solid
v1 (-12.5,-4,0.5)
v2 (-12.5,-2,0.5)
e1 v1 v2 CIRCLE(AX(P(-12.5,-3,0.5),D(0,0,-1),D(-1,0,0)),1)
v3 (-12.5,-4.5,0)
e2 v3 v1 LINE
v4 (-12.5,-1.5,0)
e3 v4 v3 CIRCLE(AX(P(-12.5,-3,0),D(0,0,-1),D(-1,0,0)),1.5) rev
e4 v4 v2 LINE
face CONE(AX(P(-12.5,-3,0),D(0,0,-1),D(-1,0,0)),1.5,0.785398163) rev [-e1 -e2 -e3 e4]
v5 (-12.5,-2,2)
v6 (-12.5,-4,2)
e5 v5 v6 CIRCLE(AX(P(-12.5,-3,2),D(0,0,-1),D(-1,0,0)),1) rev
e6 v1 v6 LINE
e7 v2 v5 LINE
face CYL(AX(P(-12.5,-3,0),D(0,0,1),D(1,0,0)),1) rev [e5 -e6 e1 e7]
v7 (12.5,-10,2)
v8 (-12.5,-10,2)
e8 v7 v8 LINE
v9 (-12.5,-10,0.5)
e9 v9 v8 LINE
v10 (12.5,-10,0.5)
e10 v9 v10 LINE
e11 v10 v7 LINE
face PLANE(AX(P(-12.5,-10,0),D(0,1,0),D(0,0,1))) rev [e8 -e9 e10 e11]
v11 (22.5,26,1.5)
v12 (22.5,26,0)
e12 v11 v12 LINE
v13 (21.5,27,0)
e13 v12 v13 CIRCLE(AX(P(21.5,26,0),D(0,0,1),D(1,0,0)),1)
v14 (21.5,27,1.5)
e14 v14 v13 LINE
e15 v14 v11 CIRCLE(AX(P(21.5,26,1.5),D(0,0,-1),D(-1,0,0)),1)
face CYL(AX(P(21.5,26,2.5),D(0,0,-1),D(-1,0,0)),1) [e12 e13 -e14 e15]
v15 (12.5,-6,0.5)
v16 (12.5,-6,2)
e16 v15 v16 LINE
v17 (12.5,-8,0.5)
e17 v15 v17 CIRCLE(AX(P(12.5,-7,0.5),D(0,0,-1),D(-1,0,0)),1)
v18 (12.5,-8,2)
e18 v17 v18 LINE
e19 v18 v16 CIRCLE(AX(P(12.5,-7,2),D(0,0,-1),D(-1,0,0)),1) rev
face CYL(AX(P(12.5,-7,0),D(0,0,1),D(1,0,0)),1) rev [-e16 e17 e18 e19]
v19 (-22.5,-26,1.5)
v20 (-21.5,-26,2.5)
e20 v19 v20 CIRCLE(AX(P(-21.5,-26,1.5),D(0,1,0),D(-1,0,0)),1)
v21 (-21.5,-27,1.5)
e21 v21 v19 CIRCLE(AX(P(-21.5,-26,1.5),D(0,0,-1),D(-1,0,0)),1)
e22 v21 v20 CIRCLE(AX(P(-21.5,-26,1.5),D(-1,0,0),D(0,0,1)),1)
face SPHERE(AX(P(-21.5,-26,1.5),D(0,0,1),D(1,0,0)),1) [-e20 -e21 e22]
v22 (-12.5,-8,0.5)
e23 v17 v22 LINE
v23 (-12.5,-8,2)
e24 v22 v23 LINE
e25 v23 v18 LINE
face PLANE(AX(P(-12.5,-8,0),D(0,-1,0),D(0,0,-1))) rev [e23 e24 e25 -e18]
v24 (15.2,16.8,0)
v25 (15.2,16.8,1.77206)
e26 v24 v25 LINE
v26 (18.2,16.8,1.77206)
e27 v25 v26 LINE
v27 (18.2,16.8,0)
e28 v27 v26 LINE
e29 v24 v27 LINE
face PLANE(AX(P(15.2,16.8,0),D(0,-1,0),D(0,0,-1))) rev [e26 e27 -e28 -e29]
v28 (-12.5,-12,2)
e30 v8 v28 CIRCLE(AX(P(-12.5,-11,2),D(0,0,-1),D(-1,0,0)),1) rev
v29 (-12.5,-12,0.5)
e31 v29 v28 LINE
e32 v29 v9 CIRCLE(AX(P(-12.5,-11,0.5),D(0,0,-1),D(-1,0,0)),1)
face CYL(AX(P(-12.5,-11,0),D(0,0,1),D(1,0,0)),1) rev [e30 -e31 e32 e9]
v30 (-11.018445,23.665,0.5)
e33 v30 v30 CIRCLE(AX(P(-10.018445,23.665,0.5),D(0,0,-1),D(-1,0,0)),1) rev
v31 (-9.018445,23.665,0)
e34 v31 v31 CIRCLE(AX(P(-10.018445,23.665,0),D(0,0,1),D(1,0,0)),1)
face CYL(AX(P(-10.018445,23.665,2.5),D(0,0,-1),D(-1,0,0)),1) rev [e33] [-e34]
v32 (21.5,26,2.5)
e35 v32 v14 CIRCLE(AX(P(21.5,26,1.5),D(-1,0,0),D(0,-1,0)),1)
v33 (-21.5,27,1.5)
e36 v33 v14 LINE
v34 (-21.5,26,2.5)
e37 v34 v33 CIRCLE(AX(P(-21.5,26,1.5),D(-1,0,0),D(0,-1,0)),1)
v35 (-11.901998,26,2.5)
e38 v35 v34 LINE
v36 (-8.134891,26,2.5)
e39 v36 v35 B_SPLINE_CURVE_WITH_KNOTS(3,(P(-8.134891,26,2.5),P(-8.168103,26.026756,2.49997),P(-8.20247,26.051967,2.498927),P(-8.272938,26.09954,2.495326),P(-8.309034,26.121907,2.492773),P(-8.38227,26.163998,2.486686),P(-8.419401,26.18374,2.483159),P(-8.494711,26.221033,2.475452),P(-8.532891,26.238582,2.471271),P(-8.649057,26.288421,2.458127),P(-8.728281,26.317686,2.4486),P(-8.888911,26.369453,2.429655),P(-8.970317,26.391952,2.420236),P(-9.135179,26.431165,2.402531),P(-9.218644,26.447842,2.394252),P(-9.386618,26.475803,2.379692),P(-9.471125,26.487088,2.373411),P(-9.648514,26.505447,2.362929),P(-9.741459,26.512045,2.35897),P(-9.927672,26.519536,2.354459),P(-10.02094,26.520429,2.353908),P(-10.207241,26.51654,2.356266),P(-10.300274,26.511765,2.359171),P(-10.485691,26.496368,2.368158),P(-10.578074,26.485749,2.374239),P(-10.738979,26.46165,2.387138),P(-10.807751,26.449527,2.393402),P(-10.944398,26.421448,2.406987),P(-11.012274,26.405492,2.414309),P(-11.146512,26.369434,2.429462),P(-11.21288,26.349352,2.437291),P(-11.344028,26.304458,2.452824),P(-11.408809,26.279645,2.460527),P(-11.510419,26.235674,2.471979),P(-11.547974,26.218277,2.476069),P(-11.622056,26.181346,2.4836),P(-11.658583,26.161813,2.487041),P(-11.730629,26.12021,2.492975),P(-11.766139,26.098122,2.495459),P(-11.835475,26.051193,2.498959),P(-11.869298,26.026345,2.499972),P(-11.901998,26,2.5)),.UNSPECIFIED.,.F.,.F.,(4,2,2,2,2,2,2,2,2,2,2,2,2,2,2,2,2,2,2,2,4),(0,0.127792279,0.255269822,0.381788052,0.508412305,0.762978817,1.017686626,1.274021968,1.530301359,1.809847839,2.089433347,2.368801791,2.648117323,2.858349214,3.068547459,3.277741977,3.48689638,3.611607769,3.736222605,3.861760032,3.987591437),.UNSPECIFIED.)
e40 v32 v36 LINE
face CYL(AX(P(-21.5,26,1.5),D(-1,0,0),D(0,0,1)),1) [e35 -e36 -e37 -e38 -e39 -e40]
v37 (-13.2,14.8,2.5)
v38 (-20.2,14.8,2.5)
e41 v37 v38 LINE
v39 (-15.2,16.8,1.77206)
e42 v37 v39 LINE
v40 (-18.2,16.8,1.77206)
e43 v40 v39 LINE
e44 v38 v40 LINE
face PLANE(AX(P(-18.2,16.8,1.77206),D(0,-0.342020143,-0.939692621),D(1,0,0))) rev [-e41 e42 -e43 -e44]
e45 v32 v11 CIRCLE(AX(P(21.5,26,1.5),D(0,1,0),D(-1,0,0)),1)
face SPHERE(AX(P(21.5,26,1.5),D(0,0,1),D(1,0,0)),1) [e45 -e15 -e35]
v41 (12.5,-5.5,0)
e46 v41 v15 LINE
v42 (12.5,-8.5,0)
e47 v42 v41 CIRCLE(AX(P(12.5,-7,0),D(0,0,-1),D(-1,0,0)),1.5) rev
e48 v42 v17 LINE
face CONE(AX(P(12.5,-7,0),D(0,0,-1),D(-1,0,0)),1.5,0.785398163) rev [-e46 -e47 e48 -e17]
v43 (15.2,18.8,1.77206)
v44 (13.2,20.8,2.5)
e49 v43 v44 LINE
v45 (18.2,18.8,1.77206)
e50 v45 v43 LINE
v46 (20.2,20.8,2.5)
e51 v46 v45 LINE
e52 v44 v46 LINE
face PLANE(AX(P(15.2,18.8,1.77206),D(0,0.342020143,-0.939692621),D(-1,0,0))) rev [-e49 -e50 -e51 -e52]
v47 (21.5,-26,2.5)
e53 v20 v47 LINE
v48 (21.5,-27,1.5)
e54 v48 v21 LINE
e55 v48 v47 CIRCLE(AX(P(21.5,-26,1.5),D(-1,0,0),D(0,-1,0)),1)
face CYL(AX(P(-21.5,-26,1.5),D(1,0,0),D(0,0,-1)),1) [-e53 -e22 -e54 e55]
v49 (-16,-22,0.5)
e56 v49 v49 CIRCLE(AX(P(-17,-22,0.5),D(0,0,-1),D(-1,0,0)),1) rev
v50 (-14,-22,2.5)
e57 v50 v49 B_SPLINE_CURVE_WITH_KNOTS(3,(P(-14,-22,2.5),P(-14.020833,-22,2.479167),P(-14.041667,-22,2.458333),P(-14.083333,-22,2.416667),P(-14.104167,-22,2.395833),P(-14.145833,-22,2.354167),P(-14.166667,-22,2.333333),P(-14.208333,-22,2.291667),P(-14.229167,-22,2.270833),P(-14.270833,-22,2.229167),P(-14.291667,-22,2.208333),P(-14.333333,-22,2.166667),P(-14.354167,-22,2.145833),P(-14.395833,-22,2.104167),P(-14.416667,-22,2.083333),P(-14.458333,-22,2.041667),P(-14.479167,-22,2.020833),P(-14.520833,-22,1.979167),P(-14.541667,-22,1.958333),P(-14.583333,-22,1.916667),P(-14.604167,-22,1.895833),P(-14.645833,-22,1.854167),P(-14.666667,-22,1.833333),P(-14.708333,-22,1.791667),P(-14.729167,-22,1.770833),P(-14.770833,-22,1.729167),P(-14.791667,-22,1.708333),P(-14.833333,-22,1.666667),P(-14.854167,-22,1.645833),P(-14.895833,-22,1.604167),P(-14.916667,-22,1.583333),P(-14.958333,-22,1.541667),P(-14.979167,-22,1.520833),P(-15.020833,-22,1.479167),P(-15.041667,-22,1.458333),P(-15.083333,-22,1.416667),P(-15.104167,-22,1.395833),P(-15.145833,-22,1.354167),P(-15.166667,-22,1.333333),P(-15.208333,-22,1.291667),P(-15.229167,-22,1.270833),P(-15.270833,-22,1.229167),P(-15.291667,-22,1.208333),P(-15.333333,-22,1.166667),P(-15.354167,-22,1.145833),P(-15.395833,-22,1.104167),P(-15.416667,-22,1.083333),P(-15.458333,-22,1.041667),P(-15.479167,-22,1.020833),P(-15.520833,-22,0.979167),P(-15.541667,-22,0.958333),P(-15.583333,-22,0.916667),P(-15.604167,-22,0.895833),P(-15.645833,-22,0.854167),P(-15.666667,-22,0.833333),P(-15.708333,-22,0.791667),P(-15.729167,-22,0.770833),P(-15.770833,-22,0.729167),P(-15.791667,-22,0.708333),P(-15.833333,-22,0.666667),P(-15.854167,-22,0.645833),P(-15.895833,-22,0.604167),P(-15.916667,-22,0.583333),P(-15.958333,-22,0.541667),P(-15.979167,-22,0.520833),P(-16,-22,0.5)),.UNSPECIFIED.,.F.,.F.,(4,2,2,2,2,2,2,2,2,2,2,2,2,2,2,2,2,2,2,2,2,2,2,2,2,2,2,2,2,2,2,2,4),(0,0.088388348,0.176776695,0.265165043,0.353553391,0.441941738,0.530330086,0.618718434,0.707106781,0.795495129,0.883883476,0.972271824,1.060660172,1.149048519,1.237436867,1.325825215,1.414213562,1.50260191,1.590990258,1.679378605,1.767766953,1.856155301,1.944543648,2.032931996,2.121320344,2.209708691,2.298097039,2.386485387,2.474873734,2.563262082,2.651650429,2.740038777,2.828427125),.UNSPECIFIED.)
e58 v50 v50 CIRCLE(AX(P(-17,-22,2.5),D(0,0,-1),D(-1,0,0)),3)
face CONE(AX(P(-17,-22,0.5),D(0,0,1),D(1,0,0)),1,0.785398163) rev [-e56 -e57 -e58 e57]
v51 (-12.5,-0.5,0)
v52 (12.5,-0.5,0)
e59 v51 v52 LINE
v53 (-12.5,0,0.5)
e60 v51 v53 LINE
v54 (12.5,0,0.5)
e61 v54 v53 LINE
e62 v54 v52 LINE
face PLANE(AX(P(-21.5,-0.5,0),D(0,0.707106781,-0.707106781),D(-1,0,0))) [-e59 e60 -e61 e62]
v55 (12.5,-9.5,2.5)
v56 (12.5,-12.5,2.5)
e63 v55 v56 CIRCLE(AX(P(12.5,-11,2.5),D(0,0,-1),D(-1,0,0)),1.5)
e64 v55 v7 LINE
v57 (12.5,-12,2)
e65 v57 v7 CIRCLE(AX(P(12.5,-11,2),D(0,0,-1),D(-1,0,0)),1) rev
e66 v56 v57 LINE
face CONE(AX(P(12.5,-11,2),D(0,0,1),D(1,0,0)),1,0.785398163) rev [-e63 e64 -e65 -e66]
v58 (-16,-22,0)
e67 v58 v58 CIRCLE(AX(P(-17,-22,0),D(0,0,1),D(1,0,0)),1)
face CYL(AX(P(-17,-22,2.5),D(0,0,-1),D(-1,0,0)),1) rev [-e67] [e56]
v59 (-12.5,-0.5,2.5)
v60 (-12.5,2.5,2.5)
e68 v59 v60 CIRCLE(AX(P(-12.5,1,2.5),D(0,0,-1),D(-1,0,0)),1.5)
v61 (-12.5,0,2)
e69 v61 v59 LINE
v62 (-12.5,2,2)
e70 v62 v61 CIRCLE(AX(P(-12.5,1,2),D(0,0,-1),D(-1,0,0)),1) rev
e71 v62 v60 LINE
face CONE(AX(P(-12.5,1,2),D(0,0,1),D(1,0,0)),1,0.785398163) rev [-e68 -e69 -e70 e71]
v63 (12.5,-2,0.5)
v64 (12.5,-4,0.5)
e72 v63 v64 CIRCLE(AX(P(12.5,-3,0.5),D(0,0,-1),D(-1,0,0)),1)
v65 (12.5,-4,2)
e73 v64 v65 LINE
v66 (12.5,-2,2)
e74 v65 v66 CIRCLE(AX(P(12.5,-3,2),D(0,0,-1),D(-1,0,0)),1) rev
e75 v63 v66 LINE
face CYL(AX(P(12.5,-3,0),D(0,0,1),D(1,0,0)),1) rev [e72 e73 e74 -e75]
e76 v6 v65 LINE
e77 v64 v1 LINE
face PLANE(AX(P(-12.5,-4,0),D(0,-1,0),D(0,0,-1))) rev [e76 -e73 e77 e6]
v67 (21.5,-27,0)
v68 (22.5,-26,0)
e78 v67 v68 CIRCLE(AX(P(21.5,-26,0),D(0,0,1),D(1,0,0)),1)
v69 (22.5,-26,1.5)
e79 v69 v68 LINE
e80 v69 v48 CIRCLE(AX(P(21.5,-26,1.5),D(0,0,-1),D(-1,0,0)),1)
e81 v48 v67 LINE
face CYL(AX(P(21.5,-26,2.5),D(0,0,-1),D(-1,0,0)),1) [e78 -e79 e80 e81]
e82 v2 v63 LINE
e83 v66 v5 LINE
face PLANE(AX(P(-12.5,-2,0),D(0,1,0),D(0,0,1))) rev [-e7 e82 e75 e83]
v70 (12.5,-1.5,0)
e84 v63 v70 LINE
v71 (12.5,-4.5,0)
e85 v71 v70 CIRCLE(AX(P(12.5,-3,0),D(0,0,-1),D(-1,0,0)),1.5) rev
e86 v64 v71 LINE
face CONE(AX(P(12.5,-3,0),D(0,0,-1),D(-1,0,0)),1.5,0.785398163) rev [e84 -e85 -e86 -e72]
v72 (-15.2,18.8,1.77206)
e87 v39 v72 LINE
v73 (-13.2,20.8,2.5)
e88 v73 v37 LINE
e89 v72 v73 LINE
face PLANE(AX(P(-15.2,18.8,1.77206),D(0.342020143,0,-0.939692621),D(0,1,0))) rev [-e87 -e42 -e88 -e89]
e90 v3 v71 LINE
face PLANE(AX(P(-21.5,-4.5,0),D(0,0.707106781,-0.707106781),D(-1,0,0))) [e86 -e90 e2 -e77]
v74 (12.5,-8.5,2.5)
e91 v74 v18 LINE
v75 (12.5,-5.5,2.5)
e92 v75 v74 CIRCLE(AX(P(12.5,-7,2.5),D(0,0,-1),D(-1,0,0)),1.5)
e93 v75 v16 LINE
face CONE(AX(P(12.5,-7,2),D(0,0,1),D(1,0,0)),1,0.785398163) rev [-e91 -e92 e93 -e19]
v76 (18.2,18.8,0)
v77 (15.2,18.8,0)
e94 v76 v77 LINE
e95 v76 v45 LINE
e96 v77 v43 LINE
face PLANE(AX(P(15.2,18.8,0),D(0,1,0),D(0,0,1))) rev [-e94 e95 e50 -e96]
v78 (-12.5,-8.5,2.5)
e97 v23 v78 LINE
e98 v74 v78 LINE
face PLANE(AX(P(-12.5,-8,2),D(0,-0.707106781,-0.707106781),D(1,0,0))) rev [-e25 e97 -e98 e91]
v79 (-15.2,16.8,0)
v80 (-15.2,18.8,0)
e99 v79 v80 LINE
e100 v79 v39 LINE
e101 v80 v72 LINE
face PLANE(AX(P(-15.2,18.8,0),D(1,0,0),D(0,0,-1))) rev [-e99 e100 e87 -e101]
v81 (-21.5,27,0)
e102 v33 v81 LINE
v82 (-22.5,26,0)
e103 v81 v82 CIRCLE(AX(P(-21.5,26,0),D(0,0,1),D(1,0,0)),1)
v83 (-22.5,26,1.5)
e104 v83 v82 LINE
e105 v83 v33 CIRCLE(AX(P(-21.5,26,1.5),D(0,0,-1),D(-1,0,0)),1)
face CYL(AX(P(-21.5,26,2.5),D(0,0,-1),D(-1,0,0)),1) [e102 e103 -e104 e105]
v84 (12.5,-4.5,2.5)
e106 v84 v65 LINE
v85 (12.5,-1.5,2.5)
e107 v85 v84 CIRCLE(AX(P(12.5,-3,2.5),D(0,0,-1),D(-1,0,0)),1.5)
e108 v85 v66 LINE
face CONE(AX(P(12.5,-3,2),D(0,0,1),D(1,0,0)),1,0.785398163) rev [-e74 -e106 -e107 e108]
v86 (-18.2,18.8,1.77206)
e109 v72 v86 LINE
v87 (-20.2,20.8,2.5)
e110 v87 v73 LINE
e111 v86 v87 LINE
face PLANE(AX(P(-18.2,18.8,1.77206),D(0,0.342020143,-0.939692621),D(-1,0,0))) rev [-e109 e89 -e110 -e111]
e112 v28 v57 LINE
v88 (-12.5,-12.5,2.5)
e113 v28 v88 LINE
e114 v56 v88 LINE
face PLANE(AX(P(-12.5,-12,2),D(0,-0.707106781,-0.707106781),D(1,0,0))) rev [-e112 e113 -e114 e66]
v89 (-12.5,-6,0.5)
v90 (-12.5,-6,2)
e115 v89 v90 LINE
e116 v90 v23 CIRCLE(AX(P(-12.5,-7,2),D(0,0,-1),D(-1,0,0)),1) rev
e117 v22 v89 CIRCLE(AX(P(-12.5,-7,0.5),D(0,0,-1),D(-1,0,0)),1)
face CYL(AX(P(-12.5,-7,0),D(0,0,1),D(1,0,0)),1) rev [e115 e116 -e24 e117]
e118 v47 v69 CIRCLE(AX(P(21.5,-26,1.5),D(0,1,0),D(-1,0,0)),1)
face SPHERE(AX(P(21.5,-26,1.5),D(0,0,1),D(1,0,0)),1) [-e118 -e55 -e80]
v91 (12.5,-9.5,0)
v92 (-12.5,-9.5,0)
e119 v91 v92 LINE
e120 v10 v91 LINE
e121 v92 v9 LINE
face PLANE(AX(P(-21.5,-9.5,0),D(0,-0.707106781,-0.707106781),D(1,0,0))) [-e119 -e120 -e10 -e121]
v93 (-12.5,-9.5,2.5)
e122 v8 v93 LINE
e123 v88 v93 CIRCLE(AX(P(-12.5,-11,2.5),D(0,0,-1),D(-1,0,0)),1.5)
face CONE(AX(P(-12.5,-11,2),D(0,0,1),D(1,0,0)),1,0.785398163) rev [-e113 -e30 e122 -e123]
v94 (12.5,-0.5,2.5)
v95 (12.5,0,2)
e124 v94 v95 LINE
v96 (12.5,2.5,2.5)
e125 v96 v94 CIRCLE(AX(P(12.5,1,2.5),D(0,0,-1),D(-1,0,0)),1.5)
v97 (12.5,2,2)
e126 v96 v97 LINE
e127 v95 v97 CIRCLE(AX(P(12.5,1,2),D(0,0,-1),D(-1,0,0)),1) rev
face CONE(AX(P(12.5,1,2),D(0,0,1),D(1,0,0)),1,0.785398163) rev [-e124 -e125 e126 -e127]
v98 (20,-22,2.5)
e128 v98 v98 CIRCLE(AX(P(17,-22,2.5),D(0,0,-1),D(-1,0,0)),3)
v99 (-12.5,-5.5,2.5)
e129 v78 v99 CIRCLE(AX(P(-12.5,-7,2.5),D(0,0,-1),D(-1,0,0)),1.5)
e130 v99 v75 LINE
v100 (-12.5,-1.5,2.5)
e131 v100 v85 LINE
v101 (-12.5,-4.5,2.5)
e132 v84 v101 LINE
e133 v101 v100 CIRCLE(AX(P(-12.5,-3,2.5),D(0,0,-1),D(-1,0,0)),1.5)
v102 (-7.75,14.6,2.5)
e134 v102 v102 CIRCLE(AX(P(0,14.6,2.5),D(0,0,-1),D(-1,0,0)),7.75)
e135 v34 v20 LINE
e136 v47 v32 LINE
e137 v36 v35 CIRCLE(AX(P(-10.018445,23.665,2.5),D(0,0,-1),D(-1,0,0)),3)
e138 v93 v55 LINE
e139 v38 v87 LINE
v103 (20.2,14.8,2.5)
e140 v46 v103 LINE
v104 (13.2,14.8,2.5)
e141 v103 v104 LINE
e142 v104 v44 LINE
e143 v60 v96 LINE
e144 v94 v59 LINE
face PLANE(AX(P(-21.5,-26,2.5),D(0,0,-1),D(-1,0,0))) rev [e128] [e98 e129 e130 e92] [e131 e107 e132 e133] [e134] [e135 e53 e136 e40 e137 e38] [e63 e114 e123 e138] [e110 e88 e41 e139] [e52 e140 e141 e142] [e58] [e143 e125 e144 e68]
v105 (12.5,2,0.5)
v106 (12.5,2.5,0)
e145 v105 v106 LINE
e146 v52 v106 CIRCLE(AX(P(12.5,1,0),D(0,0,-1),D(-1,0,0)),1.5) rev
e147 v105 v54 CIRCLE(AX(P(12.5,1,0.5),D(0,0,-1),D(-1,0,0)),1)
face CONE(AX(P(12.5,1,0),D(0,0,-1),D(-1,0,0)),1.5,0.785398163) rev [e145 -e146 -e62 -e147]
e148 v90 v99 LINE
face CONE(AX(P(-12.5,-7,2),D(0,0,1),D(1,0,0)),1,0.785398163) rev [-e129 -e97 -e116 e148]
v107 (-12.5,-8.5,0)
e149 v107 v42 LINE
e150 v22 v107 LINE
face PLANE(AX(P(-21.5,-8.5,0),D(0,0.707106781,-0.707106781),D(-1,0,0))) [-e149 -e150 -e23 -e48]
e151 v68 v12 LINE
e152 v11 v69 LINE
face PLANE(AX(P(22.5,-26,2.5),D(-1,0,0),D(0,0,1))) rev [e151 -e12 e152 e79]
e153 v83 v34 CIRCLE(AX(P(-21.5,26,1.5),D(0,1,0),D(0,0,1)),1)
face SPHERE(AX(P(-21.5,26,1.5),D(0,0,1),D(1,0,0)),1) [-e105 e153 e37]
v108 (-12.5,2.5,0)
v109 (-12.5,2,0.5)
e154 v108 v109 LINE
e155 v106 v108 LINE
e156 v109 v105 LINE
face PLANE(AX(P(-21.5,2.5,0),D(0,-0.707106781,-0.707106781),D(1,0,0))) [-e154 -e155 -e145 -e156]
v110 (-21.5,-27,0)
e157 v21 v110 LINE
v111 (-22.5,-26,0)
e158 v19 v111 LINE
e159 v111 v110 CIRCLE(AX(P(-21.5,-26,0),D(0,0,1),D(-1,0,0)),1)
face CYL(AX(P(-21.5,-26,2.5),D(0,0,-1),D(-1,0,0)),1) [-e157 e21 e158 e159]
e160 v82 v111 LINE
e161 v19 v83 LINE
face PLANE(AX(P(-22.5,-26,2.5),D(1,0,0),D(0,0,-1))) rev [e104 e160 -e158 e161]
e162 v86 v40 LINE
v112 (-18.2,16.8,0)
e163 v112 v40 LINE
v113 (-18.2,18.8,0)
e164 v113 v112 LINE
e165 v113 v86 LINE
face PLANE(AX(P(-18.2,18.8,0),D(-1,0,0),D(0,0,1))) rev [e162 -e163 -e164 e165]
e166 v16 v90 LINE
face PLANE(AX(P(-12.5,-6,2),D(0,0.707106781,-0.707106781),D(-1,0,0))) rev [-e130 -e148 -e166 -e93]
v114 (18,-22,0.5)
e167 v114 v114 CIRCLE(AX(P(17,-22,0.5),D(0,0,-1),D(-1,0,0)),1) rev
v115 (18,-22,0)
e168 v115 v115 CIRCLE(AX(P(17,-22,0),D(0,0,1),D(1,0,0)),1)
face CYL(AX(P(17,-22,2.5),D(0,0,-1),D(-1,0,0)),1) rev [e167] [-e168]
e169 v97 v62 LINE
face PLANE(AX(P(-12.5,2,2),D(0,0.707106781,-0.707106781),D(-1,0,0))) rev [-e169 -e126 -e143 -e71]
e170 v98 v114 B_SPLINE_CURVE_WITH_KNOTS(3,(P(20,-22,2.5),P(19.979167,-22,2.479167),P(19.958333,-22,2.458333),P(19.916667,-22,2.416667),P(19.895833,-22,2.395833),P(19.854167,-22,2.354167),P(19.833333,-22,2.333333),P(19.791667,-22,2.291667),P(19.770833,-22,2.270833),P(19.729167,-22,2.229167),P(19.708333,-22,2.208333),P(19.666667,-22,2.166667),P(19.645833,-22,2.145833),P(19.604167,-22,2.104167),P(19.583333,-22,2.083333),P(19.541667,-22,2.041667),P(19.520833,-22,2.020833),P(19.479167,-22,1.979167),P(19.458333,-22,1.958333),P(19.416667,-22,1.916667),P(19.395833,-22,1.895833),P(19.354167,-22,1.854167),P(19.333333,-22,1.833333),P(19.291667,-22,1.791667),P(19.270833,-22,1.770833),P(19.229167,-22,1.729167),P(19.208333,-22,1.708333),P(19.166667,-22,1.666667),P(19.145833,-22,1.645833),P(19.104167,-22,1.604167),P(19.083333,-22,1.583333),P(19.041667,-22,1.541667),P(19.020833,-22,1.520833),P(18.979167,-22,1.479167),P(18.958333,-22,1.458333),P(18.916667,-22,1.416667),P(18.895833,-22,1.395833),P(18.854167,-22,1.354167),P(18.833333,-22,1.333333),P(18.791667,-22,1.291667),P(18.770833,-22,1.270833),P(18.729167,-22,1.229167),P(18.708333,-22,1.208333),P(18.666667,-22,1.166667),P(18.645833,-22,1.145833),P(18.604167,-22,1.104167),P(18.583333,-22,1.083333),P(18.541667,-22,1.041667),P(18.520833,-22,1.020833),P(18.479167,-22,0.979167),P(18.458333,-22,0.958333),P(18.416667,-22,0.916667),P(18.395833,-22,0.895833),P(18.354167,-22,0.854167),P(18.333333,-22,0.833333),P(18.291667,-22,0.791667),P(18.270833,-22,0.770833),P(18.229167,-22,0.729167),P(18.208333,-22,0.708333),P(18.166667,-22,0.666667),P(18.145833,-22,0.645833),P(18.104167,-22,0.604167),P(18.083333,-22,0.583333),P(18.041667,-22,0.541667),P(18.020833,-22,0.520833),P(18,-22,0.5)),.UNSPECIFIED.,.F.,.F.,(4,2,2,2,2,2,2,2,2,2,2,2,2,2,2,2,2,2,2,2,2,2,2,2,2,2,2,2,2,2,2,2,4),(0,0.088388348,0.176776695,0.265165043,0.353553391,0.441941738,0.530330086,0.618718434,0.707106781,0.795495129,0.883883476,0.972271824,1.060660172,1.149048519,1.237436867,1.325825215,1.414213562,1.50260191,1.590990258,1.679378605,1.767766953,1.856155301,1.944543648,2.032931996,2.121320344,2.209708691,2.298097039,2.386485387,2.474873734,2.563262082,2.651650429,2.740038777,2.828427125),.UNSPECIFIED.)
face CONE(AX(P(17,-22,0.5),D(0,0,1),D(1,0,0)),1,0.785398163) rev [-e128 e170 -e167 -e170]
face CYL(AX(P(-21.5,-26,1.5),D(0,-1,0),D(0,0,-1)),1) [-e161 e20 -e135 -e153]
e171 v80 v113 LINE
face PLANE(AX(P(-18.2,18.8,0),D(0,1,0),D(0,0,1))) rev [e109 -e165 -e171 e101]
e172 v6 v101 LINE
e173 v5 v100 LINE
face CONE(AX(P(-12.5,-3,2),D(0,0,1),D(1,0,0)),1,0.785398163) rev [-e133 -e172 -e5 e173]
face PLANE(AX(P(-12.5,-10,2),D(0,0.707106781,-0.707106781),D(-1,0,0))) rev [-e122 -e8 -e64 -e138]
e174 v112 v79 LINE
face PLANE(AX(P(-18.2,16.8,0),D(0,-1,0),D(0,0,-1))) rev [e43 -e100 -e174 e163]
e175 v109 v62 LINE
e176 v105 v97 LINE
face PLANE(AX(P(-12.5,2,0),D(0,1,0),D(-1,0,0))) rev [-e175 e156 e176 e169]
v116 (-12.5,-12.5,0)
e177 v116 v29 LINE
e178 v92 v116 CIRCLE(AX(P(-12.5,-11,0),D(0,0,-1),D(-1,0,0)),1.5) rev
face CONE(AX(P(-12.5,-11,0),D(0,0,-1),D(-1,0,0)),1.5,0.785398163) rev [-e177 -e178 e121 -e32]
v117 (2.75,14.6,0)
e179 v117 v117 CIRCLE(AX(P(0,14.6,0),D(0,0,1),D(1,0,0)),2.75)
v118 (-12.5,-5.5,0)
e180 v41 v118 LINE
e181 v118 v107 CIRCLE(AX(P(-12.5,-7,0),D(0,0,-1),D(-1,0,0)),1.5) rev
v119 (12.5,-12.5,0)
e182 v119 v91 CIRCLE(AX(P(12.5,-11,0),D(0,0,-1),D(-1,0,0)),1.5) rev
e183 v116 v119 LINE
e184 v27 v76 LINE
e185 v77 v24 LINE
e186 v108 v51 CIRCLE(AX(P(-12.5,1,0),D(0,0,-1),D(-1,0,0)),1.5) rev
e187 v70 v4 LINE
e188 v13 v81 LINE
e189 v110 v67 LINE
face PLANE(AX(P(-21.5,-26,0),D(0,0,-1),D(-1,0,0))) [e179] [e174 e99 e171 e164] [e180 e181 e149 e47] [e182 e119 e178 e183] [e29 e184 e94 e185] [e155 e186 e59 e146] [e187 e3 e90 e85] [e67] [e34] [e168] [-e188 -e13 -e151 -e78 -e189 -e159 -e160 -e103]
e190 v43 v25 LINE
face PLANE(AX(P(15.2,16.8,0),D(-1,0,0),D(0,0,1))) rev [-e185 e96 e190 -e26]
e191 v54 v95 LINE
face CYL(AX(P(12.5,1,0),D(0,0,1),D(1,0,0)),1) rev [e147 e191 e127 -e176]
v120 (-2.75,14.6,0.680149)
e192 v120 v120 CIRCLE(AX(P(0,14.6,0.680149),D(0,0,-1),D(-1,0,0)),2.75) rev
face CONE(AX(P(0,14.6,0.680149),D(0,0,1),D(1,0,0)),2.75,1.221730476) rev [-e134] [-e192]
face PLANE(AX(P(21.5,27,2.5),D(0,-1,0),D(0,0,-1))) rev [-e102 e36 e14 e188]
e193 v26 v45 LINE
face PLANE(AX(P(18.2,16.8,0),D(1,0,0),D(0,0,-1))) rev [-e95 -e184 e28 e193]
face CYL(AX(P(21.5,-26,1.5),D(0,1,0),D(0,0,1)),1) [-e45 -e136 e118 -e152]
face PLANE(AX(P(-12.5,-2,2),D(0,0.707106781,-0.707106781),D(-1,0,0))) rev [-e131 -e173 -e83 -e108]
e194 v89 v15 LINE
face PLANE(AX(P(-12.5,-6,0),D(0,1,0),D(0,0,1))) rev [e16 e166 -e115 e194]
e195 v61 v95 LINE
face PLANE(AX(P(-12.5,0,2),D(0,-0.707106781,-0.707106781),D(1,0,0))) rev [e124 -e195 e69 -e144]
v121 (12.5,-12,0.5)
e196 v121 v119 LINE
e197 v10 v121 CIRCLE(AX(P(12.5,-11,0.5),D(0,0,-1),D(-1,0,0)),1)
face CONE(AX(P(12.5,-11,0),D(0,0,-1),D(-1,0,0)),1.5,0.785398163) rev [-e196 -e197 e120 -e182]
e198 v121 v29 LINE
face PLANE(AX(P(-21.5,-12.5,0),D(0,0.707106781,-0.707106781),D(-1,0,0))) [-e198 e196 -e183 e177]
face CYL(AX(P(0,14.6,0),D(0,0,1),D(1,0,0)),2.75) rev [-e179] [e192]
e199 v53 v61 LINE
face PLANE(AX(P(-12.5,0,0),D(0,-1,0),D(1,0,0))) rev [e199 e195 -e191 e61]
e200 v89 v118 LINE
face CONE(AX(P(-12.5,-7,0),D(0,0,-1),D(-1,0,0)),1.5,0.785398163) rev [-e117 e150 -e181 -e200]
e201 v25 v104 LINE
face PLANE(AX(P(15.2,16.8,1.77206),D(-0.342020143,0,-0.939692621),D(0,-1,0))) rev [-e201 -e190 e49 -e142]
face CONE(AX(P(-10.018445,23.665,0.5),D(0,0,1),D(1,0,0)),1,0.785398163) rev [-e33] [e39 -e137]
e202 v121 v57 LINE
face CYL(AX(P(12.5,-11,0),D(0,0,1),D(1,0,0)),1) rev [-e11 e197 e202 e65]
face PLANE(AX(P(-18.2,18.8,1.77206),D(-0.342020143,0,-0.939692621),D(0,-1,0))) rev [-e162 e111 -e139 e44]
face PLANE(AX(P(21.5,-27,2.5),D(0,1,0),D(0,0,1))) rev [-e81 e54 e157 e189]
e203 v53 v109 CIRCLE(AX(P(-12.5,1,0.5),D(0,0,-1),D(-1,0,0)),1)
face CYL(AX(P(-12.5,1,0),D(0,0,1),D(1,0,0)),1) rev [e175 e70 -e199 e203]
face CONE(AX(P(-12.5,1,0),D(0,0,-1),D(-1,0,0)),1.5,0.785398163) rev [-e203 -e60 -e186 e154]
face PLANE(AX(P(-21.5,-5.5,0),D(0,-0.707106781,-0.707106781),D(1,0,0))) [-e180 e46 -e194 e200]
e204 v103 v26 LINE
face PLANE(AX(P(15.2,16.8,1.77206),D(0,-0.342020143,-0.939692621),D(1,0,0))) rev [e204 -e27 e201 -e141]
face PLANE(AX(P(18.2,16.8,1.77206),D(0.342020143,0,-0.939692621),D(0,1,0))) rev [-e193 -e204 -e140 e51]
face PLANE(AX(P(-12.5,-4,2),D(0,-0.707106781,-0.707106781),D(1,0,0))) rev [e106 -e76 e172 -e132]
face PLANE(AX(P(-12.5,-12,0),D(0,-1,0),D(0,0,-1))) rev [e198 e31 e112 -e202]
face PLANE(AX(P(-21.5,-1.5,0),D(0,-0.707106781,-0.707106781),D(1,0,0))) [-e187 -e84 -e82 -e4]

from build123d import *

# Parameters (mm, degrees)
SKETCH1_R           = 1
SKETCH1_R_2         = 1.0000000000000018
BOSS_EXTRUDE1_DEPTH = 2.5
SKETCH2_R           = 2.7499999999999996
CUT_EXTRUDE1_DEPTH  = 2.5
CHAMFER1_SIZE       = 5
CHAMFER1_SIZE2      = 1.819851171331016
CUT_EXTRUDE2_DEPTH  = 2.5
CHAMFER2_SIZE       = 0.5
CHAMFER3_SIZE       = 2
SKETCH4_W           = 2.9999999999999982
SKETCH4_H           = 2
CUT_EXTRUDE3_DEPTH  = 2.5
CHAMFER4_SIZE       = 2
CHAMFER4_SIZE2      = 0.7279404685324065
FILLET1_R           = 1


with BuildPart() as part:
    # Sketch1 → Boss-Extrude1 (new body)
    with BuildSketch(Plane.XY):
        with BuildLine():
            Line((21.499999999999993, -26.999999999999996), (-21.499999999999993, -26.999999999999996))
            ThreePointArc((-21.499999999999993, -26.999999999999996), (-22.207106781186546, -26.707106781186543), (-22.5, -25.99999999999999))
            Line((-22.5, -25.99999999999999), (-22.5, 25.99999999999999))
            ThreePointArc((-22.5, 25.99999999999999), (-22.207106781186546, 26.707106781186543), (-21.499999999999993, 26.999999999999996))
            Line((-21.499999999999993, 26.999999999999996), (21.499999999999993, 26.999999999999996))
            ThreePointArc((21.499999999999993, 26.999999999999996), (22.207106781186546, 26.707106781186543), (22.5, 25.99999999999999))
            Line((22.5, 25.99999999999999), (22.5, -25.99999999999999))
            ThreePointArc((22.5, -25.99999999999999), (22.207106781186546, -26.707106781186543), (21.499999999999993, -26.999999999999996))
        make_face()
        with Locations((-10.018444645439217, 23.665000000000006)):
            Circle(SKETCH1_R, mode=Mode.SUBTRACT)
        with Locations((-17, -22.000000000000007)):
            Circle(SKETCH1_R_2, mode=Mode.SUBTRACT)
        with Locations((17, -22.000000000000004)):
            Circle(SKETCH1_R_2, mode=Mode.SUBTRACT)
    extrude(amount=BOSS_EXTRUDE1_DEPTH)

    # Sketch2 → Cut-Extrude1 (cut)
    with BuildSketch(Plane.XY.offset(2.5)):
        with Locations((0, 14.599999999999996)):
            Circle(SKETCH2_R)
    extrude(amount=-CUT_EXTRUDE1_DEPTH, mode=Mode.SUBTRACT)

    # Chamfer1
    chamfer1_edges = [part.edges().sort_by_distance(p)[0] for p in [
        (-2.7499999999999996, 14.599999999999996, 2.5),
    ]]
    chamfer1_side = [part.faces().sort_by_distance(p)[0] for p in [
        (0.01313623413448006, -0.11811006320101064, 2.5),
    ]]
    chamfer(chamfer1_edges, length=CHAMFER1_SIZE, length2=CHAMFER1_SIZE2, reference=chamfer1_side[0])

    # Sketch3 → Cut-Extrude2 (cut)
    with BuildSketch(Plane.XY.offset(2.5)):
        with BuildLine():
            Line((-12.5, 2), (12.5, 2.0000000000000053))
            ThreePointArc((12.5, 2.0000000000000053), (13.5, 1.0000000000000036), (12.5, 4.34e-15))
            Line((12.5, 4.34e-15), (-12.5, 0))
            ThreePointArc((-12.5, 0), (-13.5, 1.0000000000000002), (-12.5, 2))
        make_face()
        with BuildLine():
            Line((-12.5, -2), (12.5, -2))
            ThreePointArc((12.5, -2), (13.5, -3), (12.5, -4))
            Line((12.5, -4), (-12.5, -4))
            ThreePointArc((-12.5, -4), (-13.5, -3), (-12.5, -2))
        make_face()
        with BuildLine():
            Line((-12.5, -6.000000000000001), (12.5, -6.000000000000001))
            ThreePointArc((12.5, -6.000000000000001), (13.5, -7), (12.5, -8))
            Line((12.5, -8), (-12.5, -8))
            ThreePointArc((-12.5, -8), (-13.5, -7), (-12.5, -6.000000000000001))
        make_face()
        with BuildLine():
            Line((-12.5, -9.999999999999998), (12.5, -9.999999999999998))
            ThreePointArc((12.5, -9.999999999999998), (13.5, -11), (12.5, -12))
            Line((12.5, -12), (-12.5, -12))
            ThreePointArc((-12.5, -12), (-13.500000000000002, -11), (-12.5, -9.999999999999998))
        make_face()
    extrude(amount=-CUT_EXTRUDE2_DEPTH, mode=Mode.SUBTRACT)

    # Chamfer2
    chamfer2_edges = [part.edges().sort_by_distance(p)[0] for p in [
        (-13.5, 0.9999999999999999, 0),
        (0, 2.0000000000000027, 0),
        (13.5, 1.0000000000000049, 0),
        (0, 2.17e-15, 0),
        (-13.5, 0.9999999999999999, 2.5),
        (0, 2.17e-15, 2.5),
        (13.5, 1.0000000000000049, 2.5),
        (0, 2.0000000000000027, 2.5),
        (-13.5, -3, 0),
        (0, -2, 0),
        (13.5, -3, 0),
        (0, -4, 0),
        (-13.5, -3, 2.5),
        (0, -4, 2.5),
        (13.5, -3, 2.5),
        (0, -2, 2.5),
        (-13.5, -7, 0),
        (0, -6.000000000000001, 0),
        (13.5, -7, 0),
        (0, -8, 0),
        (-13.5, -7, 2.5),
        (0, -8, 2.5),
        (13.5, -7, 2.5),
        (0, -6.000000000000001, 2.5),
        (-13.500000000000002, -11, 0),
        (0, -9.999999999999998, 0),
        (13.5, -11, 0),
        (0, -12, 0),
        (-13.500000000000002, -11, 2.5),
        (0, -12, 2.5),
        (13.5, -11, 2.5),
        (0, -9.999999999999998, 2.5),
    ]]
    chamfer(chamfer2_edges, length=CHAMFER2_SIZE)

    # Chamfer3
    chamfer3_edges = [part.edges().sort_by_distance(p)[0] for p in [
        (-11.018444645439217, 23.665000000000006, 2.5),
        (-18, -22.000000000000007, 2.5),
        (15.999999999999998, -22.000000000000004, 2.5),
    ]]
    chamfer(chamfer3_edges, length=CHAMFER3_SIZE)

    # Sketch4 → Cut-Extrude3 (cut)
    with BuildSketch(Plane.XY.offset(2.5)):
        with Locations((-16.7, 17.799999999999997)):
            Rectangle(SKETCH4_W, SKETCH4_H)
        with Locations((16.7, 17.799999999999997)):
            Rectangle(SKETCH4_W, SKETCH4_H)
    extrude(amount=-CUT_EXTRUDE3_DEPTH, mode=Mode.SUBTRACT)

    # Chamfer4
    chamfer4_edges = [part.edges().sort_by_distance(p)[0] for p in [
        (-15.200000000000001, 17.799999999999997, 2.5),
        (-16.7, 18.799999999999997, 2.5),
        (-18.2, 17.799999999999997, 2.5),
        (-16.7, 16.799999999999997, 2.5),
        (18.2, 17.799999999999997, 2.5),
        (16.7, 18.799999999999997, 2.5),
        (15.200000000000001, 17.799999999999997, 2.5),
        (16.7, 16.799999999999997, 2.5),
    ]]
    chamfer4_side = [part.faces().sort_by_distance(p)[0] for p in [
        (0, -26.297077529168398, 2.5),
    ]]
    chamfer(chamfer4_edges, length=CHAMFER4_SIZE, length2=CHAMFER4_SIZE2, reference=chamfer4_side[0])

    # Fillet1
    # the kernel refuses this fillet: 1 mm, written as the material it takes off along each edge
    with BuildSketch(Plane(origin=(21.499999999999996, -25.999999999999993, 2.5), x_dir=(1, 3.55e-15, 0), z_dir=(-3.55e-15, 1, 0))) as fillet1_piece_1:
        with BuildLine():
            CenterArc((1.0000000000000036 - FILLET1_R, FILLET1_R), FILLET1_R, 270, 90)
            Line((1.0000000000000036, FILLET1_R), (1.0000000000000036, 0))
            Line((1.0000000000000036, 0), (1.0000000000000036 - FILLET1_R, 0))
        make_face()
    revolve(axis=Axis((21.499999999999996, -25.999999999999993, 2.5), (0, 0, -1)), revolution_arc=90.00000000000041, mode=Mode.SUBTRACT)
    with BuildSketch(Plane(origin=(22.5, 25.99999999999999, 2.5), x_dir=(-1, 0, 0), z_dir=(0, -1, 0)), Plane(origin=(-22.5, -25.99999999999999, 2.5), x_dir=(1, 0, 0), z_dir=(0, 1, 0))) as fillet1_piece_2:
        with BuildLine():
            CenterArc((FILLET1_R, FILLET1_R), FILLET1_R, 180, 90)
            Line((0, FILLET1_R), (0, 0))
            Line((0, 0), (FILLET1_R, 0))
        make_face()
    extrude(amount=51.99999999999998, mode=Mode.SUBTRACT)
    with BuildSketch(Plane(origin=(21.499999999999996, 25.999999999999993, 2.5), x_dir=(-3.55e-15, 1, 0), z_dir=(-1, -3.55e-15, 0))) as fillet1_piece_3:
        with BuildLine():
            CenterArc((1.0000000000000036 - FILLET1_R, FILLET1_R), FILLET1_R, 270, 90)
            Line((1.0000000000000036, FILLET1_R), (1.0000000000000036, 0))
            Line((1.0000000000000036, 0), (1.0000000000000036 - FILLET1_R, 0))
        make_face()
    revolve(axis=Axis((21.499999999999996, 25.999999999999993, 2.5), (0, 0, -1)), revolution_arc=90.00000000000041, mode=Mode.SUBTRACT)
    with BuildSketch(Plane(origin=(-21.499999999999993, 26.999999999999996, 2.5), x_dir=(0, -1, 0), z_dir=(1, 0, 0)), Plane(origin=(21.499999999999993, -26.999999999999996, 2.5), x_dir=(0, 1, 0), z_dir=(-1, 0, 0))) as fillet1_piece_4:
        with BuildLine():
            CenterArc((FILLET1_R, FILLET1_R), FILLET1_R, 180, 90)
            Line((0, FILLET1_R), (0, 0))
            Line((0, 0), (FILLET1_R, 0))
        make_face()
    extrude(amount=42.999999999999986, mode=Mode.SUBTRACT)
    with BuildSketch(Plane(origin=(-21.499999999999996, 25.999999999999993, 2.5), x_dir=(-1, -3.55e-15, 0), z_dir=(3.55e-15, -1, 0))) as fillet1_piece_5:
        with BuildLine():
            CenterArc((1.0000000000000036 - FILLET1_R, FILLET1_R), FILLET1_R, 270, 90)
            Line((1.0000000000000036, FILLET1_R), (1.0000000000000036, 0))
            Line((1.0000000000000036, 0), (1.0000000000000036 - FILLET1_R, 0))
        make_face()
    revolve(axis=Axis((-21.499999999999996, 25.999999999999993, 2.5), (0, 0, -1)), revolution_arc=90.00000000000041, mode=Mode.SUBTRACT)
    with BuildSketch(Plane(origin=(-21.499999999999996, -25.999999999999993, 2.5), x_dir=(3.55e-15, -1, 0), z_dir=(1, 3.55e-15, 0))) as fillet1_piece_6:
        with BuildLine():
            CenterArc((1.0000000000000036 - FILLET1_R, FILLET1_R), FILLET1_R, 270, 90)
            Line((1.0000000000000036, FILLET1_R), (1.0000000000000036, 0))
            Line((1.0000000000000036, 0), (1.0000000000000036 - FILLET1_R, 0))
        make_face()
    revolve(axis=Axis((-21.499999999999996, -25.999999999999993, 2.5), (0, 0, -1)), revolution_arc=90.00000000000041, mode=Mode.SUBTRACT)


solid = part.part
